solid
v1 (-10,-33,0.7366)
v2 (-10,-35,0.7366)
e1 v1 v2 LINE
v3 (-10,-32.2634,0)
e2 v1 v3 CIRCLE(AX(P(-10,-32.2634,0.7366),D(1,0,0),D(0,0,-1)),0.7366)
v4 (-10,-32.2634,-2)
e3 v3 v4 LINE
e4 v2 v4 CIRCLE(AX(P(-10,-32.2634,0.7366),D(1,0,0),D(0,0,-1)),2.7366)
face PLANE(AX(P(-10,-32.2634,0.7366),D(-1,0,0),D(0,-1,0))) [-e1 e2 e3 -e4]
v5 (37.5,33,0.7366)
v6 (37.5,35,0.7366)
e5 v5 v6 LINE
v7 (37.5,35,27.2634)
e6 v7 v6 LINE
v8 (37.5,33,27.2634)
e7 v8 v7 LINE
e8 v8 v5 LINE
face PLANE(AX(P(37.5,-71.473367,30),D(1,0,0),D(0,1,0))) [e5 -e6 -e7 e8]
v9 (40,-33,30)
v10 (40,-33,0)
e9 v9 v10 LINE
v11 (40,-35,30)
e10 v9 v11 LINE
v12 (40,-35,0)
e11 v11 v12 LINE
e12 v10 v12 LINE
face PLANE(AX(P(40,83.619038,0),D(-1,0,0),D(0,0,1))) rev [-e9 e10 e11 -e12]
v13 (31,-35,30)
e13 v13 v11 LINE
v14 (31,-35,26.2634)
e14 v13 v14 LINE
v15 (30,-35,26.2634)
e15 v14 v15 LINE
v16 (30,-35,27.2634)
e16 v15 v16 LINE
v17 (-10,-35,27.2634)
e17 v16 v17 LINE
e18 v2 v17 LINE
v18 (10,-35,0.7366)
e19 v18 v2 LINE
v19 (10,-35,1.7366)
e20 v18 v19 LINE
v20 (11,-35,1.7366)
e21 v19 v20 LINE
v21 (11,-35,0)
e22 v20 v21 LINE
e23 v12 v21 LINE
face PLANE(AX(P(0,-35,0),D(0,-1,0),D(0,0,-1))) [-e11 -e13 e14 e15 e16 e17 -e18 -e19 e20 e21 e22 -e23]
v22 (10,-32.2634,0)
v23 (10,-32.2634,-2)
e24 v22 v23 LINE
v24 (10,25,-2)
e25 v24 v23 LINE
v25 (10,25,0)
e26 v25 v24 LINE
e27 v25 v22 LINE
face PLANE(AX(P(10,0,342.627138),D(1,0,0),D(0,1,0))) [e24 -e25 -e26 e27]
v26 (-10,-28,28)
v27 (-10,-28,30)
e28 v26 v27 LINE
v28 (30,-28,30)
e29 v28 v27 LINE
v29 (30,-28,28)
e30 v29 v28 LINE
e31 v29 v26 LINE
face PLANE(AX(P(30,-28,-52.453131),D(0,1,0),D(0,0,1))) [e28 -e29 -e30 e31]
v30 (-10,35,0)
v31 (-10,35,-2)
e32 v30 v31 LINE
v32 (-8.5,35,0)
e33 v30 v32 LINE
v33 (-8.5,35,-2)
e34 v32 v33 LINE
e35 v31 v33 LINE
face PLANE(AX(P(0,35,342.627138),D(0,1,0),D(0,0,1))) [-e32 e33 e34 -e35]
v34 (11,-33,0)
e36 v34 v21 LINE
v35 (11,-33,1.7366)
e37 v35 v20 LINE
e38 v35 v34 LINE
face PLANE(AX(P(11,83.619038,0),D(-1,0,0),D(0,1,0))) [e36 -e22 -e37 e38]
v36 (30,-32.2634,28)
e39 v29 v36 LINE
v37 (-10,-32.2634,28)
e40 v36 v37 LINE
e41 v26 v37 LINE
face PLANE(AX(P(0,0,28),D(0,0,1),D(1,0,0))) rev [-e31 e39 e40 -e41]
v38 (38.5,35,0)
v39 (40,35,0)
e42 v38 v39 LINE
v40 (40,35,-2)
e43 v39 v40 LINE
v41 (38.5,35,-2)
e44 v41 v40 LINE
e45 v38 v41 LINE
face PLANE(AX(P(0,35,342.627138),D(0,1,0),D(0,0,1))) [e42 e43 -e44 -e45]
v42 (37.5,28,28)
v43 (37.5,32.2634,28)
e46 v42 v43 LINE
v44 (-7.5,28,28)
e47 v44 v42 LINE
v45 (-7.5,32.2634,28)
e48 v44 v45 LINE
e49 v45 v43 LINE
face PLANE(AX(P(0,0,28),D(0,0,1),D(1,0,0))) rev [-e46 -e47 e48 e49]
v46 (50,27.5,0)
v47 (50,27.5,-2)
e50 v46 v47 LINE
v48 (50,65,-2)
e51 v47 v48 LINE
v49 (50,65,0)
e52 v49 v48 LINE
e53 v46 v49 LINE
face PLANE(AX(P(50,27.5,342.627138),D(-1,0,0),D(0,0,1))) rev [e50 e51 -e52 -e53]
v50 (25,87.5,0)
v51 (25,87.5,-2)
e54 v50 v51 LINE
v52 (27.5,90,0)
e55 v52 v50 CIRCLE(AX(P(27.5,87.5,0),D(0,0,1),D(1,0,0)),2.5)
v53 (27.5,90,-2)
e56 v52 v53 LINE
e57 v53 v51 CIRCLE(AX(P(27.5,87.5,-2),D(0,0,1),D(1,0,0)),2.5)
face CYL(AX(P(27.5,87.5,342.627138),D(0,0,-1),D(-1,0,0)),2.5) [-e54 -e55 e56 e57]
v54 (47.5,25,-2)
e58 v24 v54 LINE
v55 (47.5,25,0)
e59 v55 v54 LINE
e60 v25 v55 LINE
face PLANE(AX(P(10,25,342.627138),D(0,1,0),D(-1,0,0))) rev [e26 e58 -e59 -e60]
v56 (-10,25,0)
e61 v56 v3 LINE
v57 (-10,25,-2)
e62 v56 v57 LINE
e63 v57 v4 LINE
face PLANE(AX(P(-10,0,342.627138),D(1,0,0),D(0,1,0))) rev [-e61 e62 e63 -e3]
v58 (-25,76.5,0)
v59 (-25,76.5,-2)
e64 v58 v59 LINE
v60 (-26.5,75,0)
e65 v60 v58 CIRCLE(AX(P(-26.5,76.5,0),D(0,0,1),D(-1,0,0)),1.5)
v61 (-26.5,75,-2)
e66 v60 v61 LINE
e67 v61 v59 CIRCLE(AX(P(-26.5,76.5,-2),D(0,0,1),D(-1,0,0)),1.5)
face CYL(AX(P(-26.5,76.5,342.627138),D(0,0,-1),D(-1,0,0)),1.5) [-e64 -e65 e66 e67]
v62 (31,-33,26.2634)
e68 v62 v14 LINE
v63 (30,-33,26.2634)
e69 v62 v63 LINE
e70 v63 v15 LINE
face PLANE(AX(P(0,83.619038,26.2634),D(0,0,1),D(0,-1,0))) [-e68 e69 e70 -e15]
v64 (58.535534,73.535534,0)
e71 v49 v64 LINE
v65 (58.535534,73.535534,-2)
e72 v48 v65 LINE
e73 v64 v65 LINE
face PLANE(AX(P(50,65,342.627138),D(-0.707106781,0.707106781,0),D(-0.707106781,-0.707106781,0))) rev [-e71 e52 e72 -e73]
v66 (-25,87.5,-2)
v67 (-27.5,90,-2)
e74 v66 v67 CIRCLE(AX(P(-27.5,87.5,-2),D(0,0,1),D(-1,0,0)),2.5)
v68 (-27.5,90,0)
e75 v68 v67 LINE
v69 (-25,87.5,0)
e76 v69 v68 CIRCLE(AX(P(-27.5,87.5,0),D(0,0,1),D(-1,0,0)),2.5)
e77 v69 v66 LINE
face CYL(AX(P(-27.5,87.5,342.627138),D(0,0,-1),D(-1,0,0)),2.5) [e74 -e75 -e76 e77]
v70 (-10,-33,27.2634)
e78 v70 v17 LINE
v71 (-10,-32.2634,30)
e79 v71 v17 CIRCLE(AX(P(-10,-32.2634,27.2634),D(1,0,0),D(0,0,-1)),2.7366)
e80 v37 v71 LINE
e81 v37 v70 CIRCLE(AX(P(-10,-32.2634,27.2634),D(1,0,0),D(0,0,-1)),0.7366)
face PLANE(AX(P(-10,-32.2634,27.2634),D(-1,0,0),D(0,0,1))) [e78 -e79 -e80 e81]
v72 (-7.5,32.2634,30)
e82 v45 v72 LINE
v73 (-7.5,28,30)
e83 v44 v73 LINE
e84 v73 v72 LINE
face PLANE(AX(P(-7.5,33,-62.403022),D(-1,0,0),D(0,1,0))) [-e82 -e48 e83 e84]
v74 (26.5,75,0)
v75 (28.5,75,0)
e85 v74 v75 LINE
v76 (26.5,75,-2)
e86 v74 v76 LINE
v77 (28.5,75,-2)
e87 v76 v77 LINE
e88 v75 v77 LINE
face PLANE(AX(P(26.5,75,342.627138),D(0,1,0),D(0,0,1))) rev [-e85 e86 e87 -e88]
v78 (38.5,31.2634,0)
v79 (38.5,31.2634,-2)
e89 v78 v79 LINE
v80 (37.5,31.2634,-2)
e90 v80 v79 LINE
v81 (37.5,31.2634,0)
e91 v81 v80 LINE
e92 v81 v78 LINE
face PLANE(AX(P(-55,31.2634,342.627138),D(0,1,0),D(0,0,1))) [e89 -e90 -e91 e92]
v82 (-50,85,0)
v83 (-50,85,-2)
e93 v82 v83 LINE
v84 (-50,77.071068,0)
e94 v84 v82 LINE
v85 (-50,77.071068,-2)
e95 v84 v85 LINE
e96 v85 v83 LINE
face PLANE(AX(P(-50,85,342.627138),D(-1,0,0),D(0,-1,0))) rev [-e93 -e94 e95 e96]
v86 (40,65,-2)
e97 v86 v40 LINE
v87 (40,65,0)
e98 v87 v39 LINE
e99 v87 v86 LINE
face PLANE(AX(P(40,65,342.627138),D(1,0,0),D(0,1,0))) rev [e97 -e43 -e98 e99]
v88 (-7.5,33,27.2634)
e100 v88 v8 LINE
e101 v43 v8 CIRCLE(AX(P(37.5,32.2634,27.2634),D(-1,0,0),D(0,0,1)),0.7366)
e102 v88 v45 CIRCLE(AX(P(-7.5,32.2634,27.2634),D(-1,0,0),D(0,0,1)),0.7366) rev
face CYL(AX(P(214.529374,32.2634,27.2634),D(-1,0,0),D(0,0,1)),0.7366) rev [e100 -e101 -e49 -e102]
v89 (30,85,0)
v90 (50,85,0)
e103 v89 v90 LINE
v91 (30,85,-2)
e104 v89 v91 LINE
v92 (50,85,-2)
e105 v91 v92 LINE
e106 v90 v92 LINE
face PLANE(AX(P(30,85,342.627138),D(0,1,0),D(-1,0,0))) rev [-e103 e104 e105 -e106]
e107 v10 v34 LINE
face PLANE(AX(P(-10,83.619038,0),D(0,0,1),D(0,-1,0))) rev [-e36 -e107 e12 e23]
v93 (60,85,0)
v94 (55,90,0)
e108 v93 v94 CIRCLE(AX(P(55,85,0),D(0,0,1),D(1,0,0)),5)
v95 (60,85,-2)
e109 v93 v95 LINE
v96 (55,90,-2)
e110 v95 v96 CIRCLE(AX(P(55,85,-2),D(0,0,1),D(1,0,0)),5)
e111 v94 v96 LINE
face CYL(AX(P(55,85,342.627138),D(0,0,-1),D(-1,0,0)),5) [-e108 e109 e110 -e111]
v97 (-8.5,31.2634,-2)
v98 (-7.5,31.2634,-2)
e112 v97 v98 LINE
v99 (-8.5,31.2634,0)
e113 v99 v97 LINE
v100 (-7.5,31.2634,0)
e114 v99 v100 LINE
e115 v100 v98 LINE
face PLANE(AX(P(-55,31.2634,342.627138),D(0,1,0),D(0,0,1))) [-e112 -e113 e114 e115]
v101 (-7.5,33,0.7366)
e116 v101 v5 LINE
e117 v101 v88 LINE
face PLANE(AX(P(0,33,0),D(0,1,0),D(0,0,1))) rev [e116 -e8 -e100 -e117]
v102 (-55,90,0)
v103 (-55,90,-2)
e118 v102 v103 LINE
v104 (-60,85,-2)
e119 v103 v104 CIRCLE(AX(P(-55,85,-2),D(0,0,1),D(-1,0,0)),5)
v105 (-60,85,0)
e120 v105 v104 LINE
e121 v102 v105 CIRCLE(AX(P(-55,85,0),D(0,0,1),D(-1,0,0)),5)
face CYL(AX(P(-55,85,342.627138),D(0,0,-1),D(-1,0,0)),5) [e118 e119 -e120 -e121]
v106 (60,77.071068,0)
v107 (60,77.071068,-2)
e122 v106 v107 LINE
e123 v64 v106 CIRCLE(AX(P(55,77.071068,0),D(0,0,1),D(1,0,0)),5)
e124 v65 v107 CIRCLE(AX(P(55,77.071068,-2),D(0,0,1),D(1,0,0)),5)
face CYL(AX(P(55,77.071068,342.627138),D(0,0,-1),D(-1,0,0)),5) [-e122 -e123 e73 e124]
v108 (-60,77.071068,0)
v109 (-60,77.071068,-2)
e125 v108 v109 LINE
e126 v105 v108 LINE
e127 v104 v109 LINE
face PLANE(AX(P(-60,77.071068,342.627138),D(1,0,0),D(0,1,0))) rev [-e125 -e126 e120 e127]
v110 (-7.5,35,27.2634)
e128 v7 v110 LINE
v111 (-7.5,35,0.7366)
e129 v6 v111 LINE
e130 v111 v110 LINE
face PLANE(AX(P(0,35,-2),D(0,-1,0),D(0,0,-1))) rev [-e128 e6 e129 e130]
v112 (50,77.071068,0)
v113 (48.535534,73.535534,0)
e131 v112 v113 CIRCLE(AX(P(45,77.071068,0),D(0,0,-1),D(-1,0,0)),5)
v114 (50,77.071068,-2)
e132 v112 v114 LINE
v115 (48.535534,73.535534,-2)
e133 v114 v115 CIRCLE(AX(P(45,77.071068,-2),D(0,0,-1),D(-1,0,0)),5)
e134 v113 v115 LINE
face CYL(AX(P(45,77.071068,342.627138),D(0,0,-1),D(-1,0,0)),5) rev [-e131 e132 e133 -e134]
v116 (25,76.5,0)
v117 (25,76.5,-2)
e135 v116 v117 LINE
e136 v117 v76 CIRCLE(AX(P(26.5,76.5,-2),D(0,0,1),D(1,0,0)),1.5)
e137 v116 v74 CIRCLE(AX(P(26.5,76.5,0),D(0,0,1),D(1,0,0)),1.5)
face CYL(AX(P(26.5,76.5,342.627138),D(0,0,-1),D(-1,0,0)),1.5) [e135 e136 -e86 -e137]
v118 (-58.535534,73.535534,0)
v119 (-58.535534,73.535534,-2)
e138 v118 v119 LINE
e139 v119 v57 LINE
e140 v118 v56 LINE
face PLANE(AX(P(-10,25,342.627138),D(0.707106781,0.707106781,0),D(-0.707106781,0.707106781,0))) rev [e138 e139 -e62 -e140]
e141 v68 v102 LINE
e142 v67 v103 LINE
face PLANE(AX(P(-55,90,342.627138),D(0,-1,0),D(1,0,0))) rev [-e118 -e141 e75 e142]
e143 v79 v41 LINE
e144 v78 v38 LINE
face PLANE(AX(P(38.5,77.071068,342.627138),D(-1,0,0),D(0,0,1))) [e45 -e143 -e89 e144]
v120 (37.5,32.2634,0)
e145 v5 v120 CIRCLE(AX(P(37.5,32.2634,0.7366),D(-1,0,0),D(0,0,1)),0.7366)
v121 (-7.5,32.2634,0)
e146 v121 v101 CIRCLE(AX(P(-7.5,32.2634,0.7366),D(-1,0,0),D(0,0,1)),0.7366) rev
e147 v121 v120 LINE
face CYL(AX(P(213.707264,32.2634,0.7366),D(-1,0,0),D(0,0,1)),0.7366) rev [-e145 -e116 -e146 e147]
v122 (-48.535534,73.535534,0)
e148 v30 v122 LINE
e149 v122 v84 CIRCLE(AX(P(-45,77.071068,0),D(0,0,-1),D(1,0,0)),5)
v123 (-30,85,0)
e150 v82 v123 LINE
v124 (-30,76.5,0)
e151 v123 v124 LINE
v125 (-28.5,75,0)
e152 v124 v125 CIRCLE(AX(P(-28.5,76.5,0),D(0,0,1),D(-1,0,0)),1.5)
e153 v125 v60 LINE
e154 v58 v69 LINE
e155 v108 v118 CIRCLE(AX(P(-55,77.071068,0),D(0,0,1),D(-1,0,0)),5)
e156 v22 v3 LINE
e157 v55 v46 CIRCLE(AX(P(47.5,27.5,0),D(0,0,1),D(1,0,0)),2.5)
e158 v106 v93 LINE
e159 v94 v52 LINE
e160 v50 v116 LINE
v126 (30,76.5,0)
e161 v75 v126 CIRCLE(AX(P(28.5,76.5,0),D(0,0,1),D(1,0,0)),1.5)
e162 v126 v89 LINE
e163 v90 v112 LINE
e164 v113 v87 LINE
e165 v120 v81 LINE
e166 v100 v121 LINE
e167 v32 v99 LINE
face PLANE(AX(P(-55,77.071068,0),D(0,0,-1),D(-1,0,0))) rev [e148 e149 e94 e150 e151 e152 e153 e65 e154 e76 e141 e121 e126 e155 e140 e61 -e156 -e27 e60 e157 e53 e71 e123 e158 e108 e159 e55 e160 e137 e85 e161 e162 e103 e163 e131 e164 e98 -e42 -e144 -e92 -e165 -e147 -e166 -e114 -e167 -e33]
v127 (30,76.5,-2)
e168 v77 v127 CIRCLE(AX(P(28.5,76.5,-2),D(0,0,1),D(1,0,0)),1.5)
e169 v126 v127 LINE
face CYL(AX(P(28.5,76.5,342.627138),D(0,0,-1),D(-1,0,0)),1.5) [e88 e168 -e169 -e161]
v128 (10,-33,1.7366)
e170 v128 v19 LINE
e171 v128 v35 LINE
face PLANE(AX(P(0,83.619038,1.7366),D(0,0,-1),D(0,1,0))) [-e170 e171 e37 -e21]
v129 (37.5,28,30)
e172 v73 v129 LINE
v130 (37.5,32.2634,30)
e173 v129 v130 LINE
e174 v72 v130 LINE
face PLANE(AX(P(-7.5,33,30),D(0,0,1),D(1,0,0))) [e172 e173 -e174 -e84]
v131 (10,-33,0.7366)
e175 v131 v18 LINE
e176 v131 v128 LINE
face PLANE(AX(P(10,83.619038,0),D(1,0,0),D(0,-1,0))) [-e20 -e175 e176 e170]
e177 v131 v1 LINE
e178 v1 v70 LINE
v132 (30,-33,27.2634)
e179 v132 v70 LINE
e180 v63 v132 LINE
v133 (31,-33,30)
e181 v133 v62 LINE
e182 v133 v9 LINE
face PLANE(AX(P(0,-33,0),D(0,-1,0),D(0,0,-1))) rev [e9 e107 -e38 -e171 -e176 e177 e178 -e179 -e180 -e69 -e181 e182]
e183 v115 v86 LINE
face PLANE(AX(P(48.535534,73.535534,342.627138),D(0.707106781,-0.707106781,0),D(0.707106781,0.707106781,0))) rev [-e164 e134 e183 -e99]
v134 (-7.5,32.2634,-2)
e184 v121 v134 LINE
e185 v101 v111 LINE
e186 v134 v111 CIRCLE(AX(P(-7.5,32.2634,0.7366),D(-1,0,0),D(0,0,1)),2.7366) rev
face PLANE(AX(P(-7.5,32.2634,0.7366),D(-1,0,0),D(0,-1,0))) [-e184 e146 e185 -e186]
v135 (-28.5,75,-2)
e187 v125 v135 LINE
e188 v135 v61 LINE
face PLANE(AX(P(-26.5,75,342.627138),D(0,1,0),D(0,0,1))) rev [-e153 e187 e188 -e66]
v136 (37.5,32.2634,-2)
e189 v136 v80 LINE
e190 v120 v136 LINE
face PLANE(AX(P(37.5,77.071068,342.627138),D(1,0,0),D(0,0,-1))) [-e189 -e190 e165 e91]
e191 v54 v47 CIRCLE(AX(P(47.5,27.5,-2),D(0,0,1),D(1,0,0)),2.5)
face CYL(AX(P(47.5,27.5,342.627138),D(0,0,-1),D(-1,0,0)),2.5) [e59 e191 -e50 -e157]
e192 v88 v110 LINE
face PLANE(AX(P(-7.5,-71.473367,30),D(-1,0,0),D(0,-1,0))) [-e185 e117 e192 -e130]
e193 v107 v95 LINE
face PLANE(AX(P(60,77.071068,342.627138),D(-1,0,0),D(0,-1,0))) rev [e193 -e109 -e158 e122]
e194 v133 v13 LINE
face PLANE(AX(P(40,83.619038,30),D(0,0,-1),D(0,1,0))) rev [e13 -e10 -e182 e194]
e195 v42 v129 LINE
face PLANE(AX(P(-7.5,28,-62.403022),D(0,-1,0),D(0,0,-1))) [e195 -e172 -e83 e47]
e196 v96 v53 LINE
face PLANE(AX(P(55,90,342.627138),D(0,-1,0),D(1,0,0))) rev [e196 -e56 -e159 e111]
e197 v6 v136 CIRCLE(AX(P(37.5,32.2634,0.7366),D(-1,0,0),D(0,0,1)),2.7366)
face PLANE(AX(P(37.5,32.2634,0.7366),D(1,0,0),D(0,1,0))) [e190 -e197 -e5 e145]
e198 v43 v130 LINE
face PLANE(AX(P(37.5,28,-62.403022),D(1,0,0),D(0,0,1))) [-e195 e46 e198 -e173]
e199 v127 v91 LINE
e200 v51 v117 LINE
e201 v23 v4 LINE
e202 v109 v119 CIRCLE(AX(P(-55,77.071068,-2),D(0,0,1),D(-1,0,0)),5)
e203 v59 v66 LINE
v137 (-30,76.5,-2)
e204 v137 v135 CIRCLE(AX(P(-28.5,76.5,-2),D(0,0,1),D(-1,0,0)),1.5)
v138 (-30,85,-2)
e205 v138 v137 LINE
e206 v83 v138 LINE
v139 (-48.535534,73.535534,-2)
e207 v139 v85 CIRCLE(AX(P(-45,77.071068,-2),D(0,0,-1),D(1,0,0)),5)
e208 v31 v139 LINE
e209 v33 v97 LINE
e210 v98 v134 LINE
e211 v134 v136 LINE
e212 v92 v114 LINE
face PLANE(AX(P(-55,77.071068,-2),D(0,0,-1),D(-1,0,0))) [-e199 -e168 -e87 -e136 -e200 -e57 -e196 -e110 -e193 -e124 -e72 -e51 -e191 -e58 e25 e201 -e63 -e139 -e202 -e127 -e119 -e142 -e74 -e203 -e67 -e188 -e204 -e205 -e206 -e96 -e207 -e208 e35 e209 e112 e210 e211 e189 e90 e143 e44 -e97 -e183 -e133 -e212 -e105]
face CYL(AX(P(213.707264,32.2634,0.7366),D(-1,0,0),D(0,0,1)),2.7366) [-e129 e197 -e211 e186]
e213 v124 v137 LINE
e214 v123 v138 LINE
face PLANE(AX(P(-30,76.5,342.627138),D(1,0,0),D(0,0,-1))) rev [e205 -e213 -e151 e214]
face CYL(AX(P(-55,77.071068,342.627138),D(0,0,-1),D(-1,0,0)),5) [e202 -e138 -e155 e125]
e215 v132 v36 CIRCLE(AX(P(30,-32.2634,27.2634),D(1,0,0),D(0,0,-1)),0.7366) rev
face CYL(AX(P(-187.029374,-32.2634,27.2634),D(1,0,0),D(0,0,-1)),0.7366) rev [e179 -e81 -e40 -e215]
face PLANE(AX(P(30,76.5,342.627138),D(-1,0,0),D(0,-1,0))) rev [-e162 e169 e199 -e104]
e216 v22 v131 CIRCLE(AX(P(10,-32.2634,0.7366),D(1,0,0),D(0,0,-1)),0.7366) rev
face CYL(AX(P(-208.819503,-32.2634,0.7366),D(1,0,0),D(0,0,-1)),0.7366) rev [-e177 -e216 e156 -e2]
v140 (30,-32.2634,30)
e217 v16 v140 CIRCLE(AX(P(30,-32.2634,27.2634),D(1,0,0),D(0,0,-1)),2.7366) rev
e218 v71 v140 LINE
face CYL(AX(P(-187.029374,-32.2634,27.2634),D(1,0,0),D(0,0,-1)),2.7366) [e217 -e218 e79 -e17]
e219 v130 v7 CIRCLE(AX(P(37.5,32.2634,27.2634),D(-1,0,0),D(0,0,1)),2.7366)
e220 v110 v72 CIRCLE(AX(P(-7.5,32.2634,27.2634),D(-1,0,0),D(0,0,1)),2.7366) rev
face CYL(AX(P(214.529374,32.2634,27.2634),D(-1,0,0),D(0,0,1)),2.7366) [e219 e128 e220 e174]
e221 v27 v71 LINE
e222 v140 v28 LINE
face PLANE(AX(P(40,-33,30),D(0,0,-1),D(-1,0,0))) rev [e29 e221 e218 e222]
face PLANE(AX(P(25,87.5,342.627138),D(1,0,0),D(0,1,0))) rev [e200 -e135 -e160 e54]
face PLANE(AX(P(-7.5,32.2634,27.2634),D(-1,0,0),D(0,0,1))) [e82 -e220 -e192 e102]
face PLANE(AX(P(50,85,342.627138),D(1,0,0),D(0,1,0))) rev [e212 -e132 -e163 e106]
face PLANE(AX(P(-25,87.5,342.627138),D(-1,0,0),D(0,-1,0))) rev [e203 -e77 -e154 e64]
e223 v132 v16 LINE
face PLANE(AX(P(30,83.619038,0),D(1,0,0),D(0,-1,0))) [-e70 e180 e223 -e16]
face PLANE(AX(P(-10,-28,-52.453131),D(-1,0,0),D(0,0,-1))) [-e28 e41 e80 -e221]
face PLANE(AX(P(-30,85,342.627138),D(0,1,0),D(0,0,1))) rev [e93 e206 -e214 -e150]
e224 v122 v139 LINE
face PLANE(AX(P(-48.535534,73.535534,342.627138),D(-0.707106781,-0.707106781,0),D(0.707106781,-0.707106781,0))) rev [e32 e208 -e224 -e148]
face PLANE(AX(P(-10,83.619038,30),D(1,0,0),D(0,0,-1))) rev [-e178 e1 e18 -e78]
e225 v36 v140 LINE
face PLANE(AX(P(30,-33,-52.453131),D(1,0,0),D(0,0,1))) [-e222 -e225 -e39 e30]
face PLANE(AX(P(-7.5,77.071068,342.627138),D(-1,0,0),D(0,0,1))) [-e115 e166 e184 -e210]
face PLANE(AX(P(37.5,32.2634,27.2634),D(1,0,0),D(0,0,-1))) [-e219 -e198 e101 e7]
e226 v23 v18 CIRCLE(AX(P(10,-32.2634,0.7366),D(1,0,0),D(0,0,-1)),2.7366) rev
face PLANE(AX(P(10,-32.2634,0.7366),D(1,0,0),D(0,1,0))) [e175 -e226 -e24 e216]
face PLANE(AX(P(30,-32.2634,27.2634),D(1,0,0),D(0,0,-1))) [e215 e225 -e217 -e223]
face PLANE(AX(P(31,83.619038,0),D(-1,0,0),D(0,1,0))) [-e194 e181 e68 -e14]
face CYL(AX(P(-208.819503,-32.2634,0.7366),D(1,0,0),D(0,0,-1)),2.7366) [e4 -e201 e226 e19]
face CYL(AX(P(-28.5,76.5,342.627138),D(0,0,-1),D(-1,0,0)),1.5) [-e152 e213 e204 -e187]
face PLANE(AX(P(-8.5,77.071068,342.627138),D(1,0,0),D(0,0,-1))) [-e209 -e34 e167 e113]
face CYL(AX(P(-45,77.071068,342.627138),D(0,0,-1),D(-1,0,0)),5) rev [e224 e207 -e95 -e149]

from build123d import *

# Parameters (mm, degrees)
BOSS_EXTRUDE1_DEPTH          = 2
BOSS_EXTRUDE1_2_DEPTH        = 2
BASE_W                       = 20
BASE_H                       = 70
BOSS_EXTRUDE2_DEPTH          = 2
F_3_CM_HANG_LOWER_W          = 50
F_3_CM_HANG_LOWER_H          = 30
BOSS_EXTRUDE3_DEPTH          = 2
F_3CM_HANG_UPPER_W           = 45
F_3CM_HANG_UPPER_H           = 30
BOSS_EXTRUDE4_DEPTH          = 2
LOWER_HOLDER_2ND_EXTEND_W    = 40
LOWER_HOLDER_2ND_EXTEND_H    = 5
BOSS_EXTRUDE5_DEPTH          = 2
UPPER_HOLDER_2ND_EXTEND_W    = 45
UPPER_HOLDER_2ND_EXTEND_H    = 5
BOSS_EXTRUDE6_DEPTH          = 2
FLATTEN_BENDS1_START         = -10
FLATTEN_BENDS1_DEPTH         = 50
FLATTEN_BENDS1_START_2       = -8.5
FLATTEN_BENDS1_2_OUTLINE_W   = 3.7366
FLATTEN_BENDS1_2_OUTLINE_H   = 2
FLATTEN_BENDS1_2_DEPTH       = 1
FLATTEN_BENDS1_START_3       = 37.5
FLATTEN_BENDS1_3_OUTLINE_W   = 3.7366
FLATTEN_BENDS1_3_OUTLINE_H   = 2
FLATTEN_BENDS1_3_DEPTH       = 1
FLATTEN_BENDS1_START_4       = -7.5
FLATTEN_BENDS1_4_OUTLINE_W   = 33.509289802
FLATTEN_BENDS1_4_OUTLINE_H   = 2
FLATTEN_BENDS1_4_OUTLINE_W_2 = 24.5268
FLATTEN_BENDS1_4_DEPTH       = 45
FLATTEN_BENDS1_5_OUTLINE_W   = 32.518044901
FLATTEN_BENDS1_5_OUTLINE_H   = 2
FLATTEN_BENDS1_5_DEPTH       = 39.999999999
FLATTEN_BENDS1_START_5       = 11
FLATTEN_BENDS1_6_OUTLINE_W   = 26.2634
FLATTEN_BENDS1_6_OUTLINE_H   = 2
FLATTEN_BENDS1_6_DEPTH       = 29
FLATTEN_BENDS1_START_6       = 31
FLATTEN_BENDS1_7_OUTLINE_W   = 3.7366
FLATTEN_BENDS1_7_OUTLINE_H   = 2
FLATTEN_BENDS1_7_DEPTH       = 9
FLATTEN_BENDS1_8_OUTLINE_W   = 0.991244901
FLATTEN_BENDS1_8_OUTLINE_H   = 2
FLATTEN_BENDS1_8_DEPTH       = 20
PROCESS_BENDS1_START         = -7.5
PROCESS_BENDS1_DEPTH         = 45
PROCESS_BENDS1_START_2       = -10
PROCESS_BENDS1_2_DEPTH       = 50
PROCESS_BENDS1_START_3       = 11
PROCESS_BENDS1_3_DEPTH       = 29
PROCESS_BENDS1_4_OUTLINE_W   = 2
PROCESS_BENDS1_4_OUTLINE_H   = 24.5268
PROCESS_BENDS1_4_DEPTH       = 45
PROCESS_BENDS1_5_DEPTH       = 39.999999999
PROCESS_BENDS1_6_OUTLINE_W   = 2
PROCESS_BENDS1_6_OUTLINE_H   = 26.2634
PROCESS_BENDS1_6_DEPTH       = 29
PROCESS_BENDS1_7_DEPTH       = 20
PROCESS_BENDS1_START_4       = 31
PROCESS_BENDS1_8_OUTLINE_W   = 2
PROCESS_BENDS1_8_OUTLINE_H   = 3.7366
PROCESS_BENDS1_8_DEPTH       = 9


# Read off the part's stored shape, not the designer's step: Flatten-Bends1, Process-Bends1
with BuildPart() as part:
    # hook → Boss-Extrude1 (new body)
    with BuildSketch(Plane.XY):
        with BuildLine():
            Line((-10, 35), (-10, 25))
            Line((-10, 25), (-58.535533906, 73.535533906))
            ThreePointArc((-58.535533906, 73.535533906), (-59.619397663, 75.15765065), (-60, 77.071067812))
            Line((-60, 77.071067812), (-60, 85))
            ThreePointArc((-60, 85), (-58.535533906, 88.535533906), (-55, 90))
            Line((-55, 90), (-27.5, 90))
            ThreePointArc((-27.5, 90), (-25.732233047, 89.267766953), (-25, 87.5))
            Line((-25, 87.5), (-24.999999999, 76.499999999))
            ThreePointArc((-24.999999999, 76.499999999), (-25.439339828, 75.439339828), (-26.499999999, 74.999999999))
            Line((-26.499999999, 74.999999999), (-28.499999999, 74.999999999))
            ThreePointArc((-28.499999999, 74.999999999), (-29.560660171, 75.439339828), (-29.999999999, 76.499999999))
            Line((-29.999999999, 76.499999999), (-29.999999999, 84.999999999))
            Line((-29.999999999, 84.999999999), (-49.999999999, 84.999999999))
            Line((-49.999999999, 84.999999999), (-50, 77.071067812))
            ThreePointArc((-50, 77.071067812), (-49.619397663, 75.15765065), (-48.535533906, 73.535533906))
            Line((-48.535533906, 73.535533906), (-10, 35))
        make_face()
    extrude(amount=-BOSS_EXTRUDE1_DEPTH)



with BuildPart() as body_2:
    # hook → Boss-Extrude1 2 (new body)
    with BuildSketch(Plane.XY):
        with BuildLine():
            Line((48.535533906, 73.535533906), (40, 65))
            Line((40, 65), (40, 35))
            Line((40, 35), (10, 35))
            Line((10, 35), (10, 25))
            Line((10, 25), (47.5, 25))
            ThreePointArc((47.5, 25), (49.267766953, 25.732233047), (50, 27.5))
            Line((50, 27.5), (50, 65))
            Line((50, 65), (58.535533906, 73.535533906))
            ThreePointArc((58.535533906, 73.535533906), (59.619397663, 75.15765065), (60, 77.071067812))
            Line((60, 77.071067812), (60, 85))
            ThreePointArc((60, 85), (58.535533906, 88.535533906), (55, 90))
            Line((55, 90), (27.5, 90))
            ThreePointArc((27.5, 90), (25.732233047, 89.267766953), (25, 87.5))
            Line((25, 87.5), (24.999999999, 76.499999999))
            ThreePointArc((24.999999999, 76.499999999), (25.439339828, 75.439339828), (26.499999999, 74.999999999))
            Line((26.499999999, 74.999999999), (28.499999999, 74.999999999))
            ThreePointArc((28.499999999, 74.999999999), (29.560660171, 75.439339828), (29.999999999, 76.499999999))
            Line((29.999999999, 76.499999999), (29.999999999, 84.999999999))
            Line((29.999999999, 84.999999999), (49.999999999, 84.999999999))
            Line((49.999999999, 84.999999999), (50, 77.071067812))
            ThreePointArc((50, 77.071067812), (49.619397663, 75.15765065), (48.535533906, 73.535533906))
        make_face()
    extrude(amount=-BOSS_EXTRUDE1_2_DEPTH)


with BuildPart() as part_1:
    add(part.part)

    add(body_2.part)  # Boss-Extrude2 merges body 2
    # base → Boss-Extrude2 (add)
    with BuildSketch(Plane.XY):
        Rectangle(BASE_W, BASE_H)
    extrude(amount=-BOSS_EXTRUDE2_DEPTH)

    # 3cm hang upper → Boss-Extrude4 (add)
    with BuildSketch(Plane(origin=(0, 35, 0), x_dir=(1, 0, 0), z_dir=(0, 1, 0))):
        with Locations((15, -15)):
            Rectangle(F_3CM_HANG_UPPER_W, F_3CM_HANG_UPPER_H)
    extrude(amount=-BOSS_EXTRUDE4_DEPTH)


with BuildPart() as body_2_2:
    # 3 cm hang lower → Boss-Extrude3 (new body)
    with BuildSketch(Plane(origin=(0, -35, 0), x_dir=(1, 0, 0), z_dir=(0, 1, 0))):
        with Locations((15, -15)):
            Rectangle(F_3_CM_HANG_LOWER_W, F_3_CM_HANG_LOWER_H)
    extrude(amount=BOSS_EXTRUDE3_DEPTH)


    add(part_1.part)  # Boss-Extrude5 merges part
    # lower holder 2nd extend → Boss-Extrude5 (add)
    with BuildSketch(Plane.XY.offset(30)):
        with Locations((10, -30.5)):
            Rectangle(LOWER_HOLDER_2ND_EXTEND_W, LOWER_HOLDER_2ND_EXTEND_H)
    extrude(amount=-BOSS_EXTRUDE5_DEPTH)

    # upper holder 2nd extend → Boss-Extrude6 (add)
    with BuildSketch(Plane.XY.offset(30)):
        with Locations((15, 30.5)):
            Rectangle(UPPER_HOLDER_2ND_EXTEND_W, UPPER_HOLDER_2ND_EXTEND_H)
    extrude(amount=-BOSS_EXTRUDE6_DEPTH)

    # Flatten-Bends1 outline → Flatten-Bends1 (cut)
    with BuildSketch(Plane.YZ.offset(FLATTEN_BENDS1_START)):
        Polygon((-33, 0), (-33, 28), (-28, 28), (-28, 30), (-35, 30), (-35, 0), align=None)
        Polygon((33, 28), (33, 0), (35, 0), (35, 30), (28, 30), (28, 28), align=None)
    extrude(amount=FLATTEN_BENDS1_DEPTH, mode=Mode.SUBTRACT)

    # Flatten-Bends1 2 outline → Flatten-Bends1 2 (cut)
    with BuildSketch(Plane.YZ.offset(FLATTEN_BENDS1_START_2)):
        with Locations((33.1317, -1)):
            Rectangle(FLATTEN_BENDS1_2_OUTLINE_W, FLATTEN_BENDS1_2_OUTLINE_H)
    extrude(amount=FLATTEN_BENDS1_2_DEPTH, mode=Mode.SUBTRACT)

    # Flatten-Bends1 3 outline → Flatten-Bends1 3 (cut)
    with BuildSketch(Plane.YZ.offset(FLATTEN_BENDS1_START_3)):
        with Locations((33.1317, -1)):
            Rectangle(FLATTEN_BENDS1_3_OUTLINE_W, FLATTEN_BENDS1_3_OUTLINE_H)
    extrude(amount=FLATTEN_BENDS1_3_DEPTH, mode=Mode.SUBTRACT)

    # Flatten-Bends1 4 outline → Flatten-Bends1 4 (add)
    with BuildSketch(Plane.YZ.offset(FLATTEN_BENDS1_START_4)):
        with Locations((51.754644901, -1)):
            Rectangle(FLATTEN_BENDS1_4_OUTLINE_W, FLATTEN_BENDS1_4_OUTLINE_H)
        with Locations((-48.254644901, -1)):
            Rectangle(FLATTEN_BENDS1_4_OUTLINE_W_2, FLATTEN_BENDS1_4_OUTLINE_H)
    extrude(amount=FLATTEN_BENDS1_4_DEPTH)

    # Flatten-Bends1 5 outline → Flatten-Bends1 5 (add)
    with BuildSketch(Plane.YZ.offset(FLATTEN_BENDS1_START)):
        with Locations((-52.250267351, -1)):
            Rectangle(FLATTEN_BENDS1_5_OUTLINE_W, FLATTEN_BENDS1_5_OUTLINE_H)
    extrude(amount=FLATTEN_BENDS1_5_DEPTH)

    # Flatten-Bends1 6 outline → Flatten-Bends1 6 (add)
    with BuildSketch(Plane.YZ.offset(FLATTEN_BENDS1_START_5)):
        with Locations((-47.386344901, -1)):
            Rectangle(FLATTEN_BENDS1_6_OUTLINE_W, FLATTEN_BENDS1_6_OUTLINE_H)
    extrude(amount=FLATTEN_BENDS1_6_DEPTH)

    # Flatten-Bends1 7 outline → Flatten-Bends1 7 (add)
    with BuildSketch(Plane.YZ.offset(FLATTEN_BENDS1_START_6)):
        with Locations((-62.386344901, -1)):
            Rectangle(FLATTEN_BENDS1_7_OUTLINE_W, FLATTEN_BENDS1_7_OUTLINE_H)
    extrude(amount=FLATTEN_BENDS1_7_DEPTH)

    # Flatten-Bends1 8 outline → Flatten-Bends1 8 (add)
    with BuildSketch(Plane.YZ.offset(FLATTEN_BENDS1_START)):
        with Locations((-35.495622451, -1)):
            Rectangle(FLATTEN_BENDS1_8_OUTLINE_W, FLATTEN_BENDS1_8_OUTLINE_H)
    extrude(amount=FLATTEN_BENDS1_8_DEPTH)

    # Process-Bends1 outline → Process-Bends1 (cut)
    with BuildSketch(Plane.YZ.offset(PROCESS_BENDS1_START)):
        with BuildLine():
            Line((68.509289802, 0), (34.899002398, 0))
            ThreePointArc((34.899002398, 0), (33.917667209, -1.443395312), (32.2634, -2))
            Line((32.2634, -2), (68.509289802, -2))
            Line((68.509289802, -2), (68.509289802, 0))
        make_face()
        with BuildLine():
            Line((-68.509289802, 0), (-68.509289802, -2))
            Line((-68.509289802, -2), (-32.2634, -2))
            ThreePointArc((-32.2634, -2), (-33.917667209, -1.443395312), (-34.899002398, 0))
            Line((-34.899002398, 0), (-68.509289802, 0))
        make_face()
    extrude(amount=PROCESS_BENDS1_DEPTH, mode=Mode.SUBTRACT)

    # Process-Bends1 2 outline → Process-Bends1 2 (cut)
    with BuildSketch(Plane.YZ.offset(PROCESS_BENDS1_START_2)):
        with BuildLine():
            Line((-68.509289802, 0), (-68.509289802, -2))
            Line((-68.509289802, -2), (-32.2634, -2))
            ThreePointArc((-32.2634, -2), (-33.917667209, -1.443395312), (-34.899002398, 0))
            Line((-34.899002398, 0), (-68.509289802, 0))
        make_face()
    extrude(amount=PROCESS_BENDS1_2_DEPTH, mode=Mode.SUBTRACT)

    # Process-Bends1 3 outline → Process-Bends1 3 (cut)
    with BuildSketch(Plane.YZ.offset(PROCESS_BENDS1_START_3)):
        with BuildLine():
            Line((-34.254644901, 0), (-34.899002398, 0))
            ThreePointArc((-34.899002398, 0), (-34.646082873, -0.609431903), (-34.254644901, -1.140611576))
            Line((-34.254644901, -1.140611576), (-34.254644901, 0))
        make_face()
    extrude(amount=PROCESS_BENDS1_3_DEPTH, mode=Mode.SUBTRACT)

    # Process-Bends1 4 outline → Process-Bends1 4 (add)
    with BuildSketch(Plane.YZ.offset(PROCESS_BENDS1_START)):
        with BuildLine():
            Line((32.2634, 30), (28, 30))
            Line((28, 30), (28, 28))
            Line((28, 28), (32.2634, 28))
            ThreePointArc((32.2634, 28), (32.784254855, 27.784254855), (33, 27.2634))
            Line((33, 27.2634), (33, 0.7366))
            ThreePointArc((33, 0.7366), (32.784254855, 0.215745145), (32.2634, 0))
            Line((32.2634, 0), (34.899002398, 0))
            ThreePointArc((34.899002398, 0), (34.974633029, 0.364854094), (35, 0.7366))
            Line((35, 0.7366), (35, 27.2634))
            ThreePointArc((35, 27.2634), (34.198468417, 29.198468417), (32.2634, 30))
        make_face()
        with Locations((-34, 14)):
            Rectangle(PROCESS_BENDS1_4_OUTLINE_W, PROCESS_BENDS1_4_OUTLINE_H)
    extrude(amount=PROCESS_BENDS1_4_DEPTH)

    # Process-Bends1 5 outline → Process-Bends1 5 (add)
    with BuildSketch(Plane.YZ.offset(PROCESS_BENDS1_START_2)):
        with BuildLine():
            Line((-28, 30), (-32.2634, 30))
            ThreePointArc((-32.2634, 30), (-34.198468417, 29.198468417), (-35, 27.2634))
            Line((-35, 27.2634), (-35, 1.7366))
            Line((-35, 1.7366), (-33, 1.7366))
            Line((-33, 1.7366), (-33, 27.2634))
            ThreePointArc((-33, 27.2634), (-32.784254855, 27.784254855), (-32.2634, 28))
            Line((-32.2634, 28), (-28, 28))
            Line((-28, 28), (-28, 30))
        make_face()
    extrude(amount=PROCESS_BENDS1_5_DEPTH)

    # Process-Bends1 6 outline → Process-Bends1 6 (add)
    with BuildSketch(Plane.YZ.offset(PROCESS_BENDS1_START_3)):
        with Locations((-34, 13.1317)):
            Rectangle(PROCESS_BENDS1_6_OUTLINE_W, PROCESS_BENDS1_6_OUTLINE_H)
    extrude(amount=PROCESS_BENDS1_6_DEPTH)

    # Process-Bends1 7 outline → Process-Bends1 7 (add)
    with BuildSketch(Plane.YZ.offset(PROCESS_BENDS1_START_2)):
        with BuildLine():
            Line((-33, 0.7366), (-33, 1.7366))
            Line((-33, 1.7366), (-35, 1.7366))
            Line((-35, 1.7366), (-35, 0.7366))
            ThreePointArc((-35, 0.7366), (-34.974633029, 0.364854094), (-34.899002398, 0))
            Line((-34.899002398, 0), (-32.2634, 0))
            ThreePointArc((-32.2634, 0), (-32.784254855, 0.215745145), (-33, 0.7366))
        make_face()
    extrude(amount=PROCESS_BENDS1_7_DEPTH)

    # Process-Bends1 8 outline → Process-Bends1 8 (add)
    with BuildSketch(Plane.YZ.offset(PROCESS_BENDS1_START_4)):
        with Locations((-34, 28.1317)):
            Rectangle(PROCESS_BENDS1_8_OUTLINE_W, PROCESS_BENDS1_8_OUTLINE_H)
    extrude(amount=PROCESS_BENDS1_8_DEPTH)


solid = body_2_2.part
